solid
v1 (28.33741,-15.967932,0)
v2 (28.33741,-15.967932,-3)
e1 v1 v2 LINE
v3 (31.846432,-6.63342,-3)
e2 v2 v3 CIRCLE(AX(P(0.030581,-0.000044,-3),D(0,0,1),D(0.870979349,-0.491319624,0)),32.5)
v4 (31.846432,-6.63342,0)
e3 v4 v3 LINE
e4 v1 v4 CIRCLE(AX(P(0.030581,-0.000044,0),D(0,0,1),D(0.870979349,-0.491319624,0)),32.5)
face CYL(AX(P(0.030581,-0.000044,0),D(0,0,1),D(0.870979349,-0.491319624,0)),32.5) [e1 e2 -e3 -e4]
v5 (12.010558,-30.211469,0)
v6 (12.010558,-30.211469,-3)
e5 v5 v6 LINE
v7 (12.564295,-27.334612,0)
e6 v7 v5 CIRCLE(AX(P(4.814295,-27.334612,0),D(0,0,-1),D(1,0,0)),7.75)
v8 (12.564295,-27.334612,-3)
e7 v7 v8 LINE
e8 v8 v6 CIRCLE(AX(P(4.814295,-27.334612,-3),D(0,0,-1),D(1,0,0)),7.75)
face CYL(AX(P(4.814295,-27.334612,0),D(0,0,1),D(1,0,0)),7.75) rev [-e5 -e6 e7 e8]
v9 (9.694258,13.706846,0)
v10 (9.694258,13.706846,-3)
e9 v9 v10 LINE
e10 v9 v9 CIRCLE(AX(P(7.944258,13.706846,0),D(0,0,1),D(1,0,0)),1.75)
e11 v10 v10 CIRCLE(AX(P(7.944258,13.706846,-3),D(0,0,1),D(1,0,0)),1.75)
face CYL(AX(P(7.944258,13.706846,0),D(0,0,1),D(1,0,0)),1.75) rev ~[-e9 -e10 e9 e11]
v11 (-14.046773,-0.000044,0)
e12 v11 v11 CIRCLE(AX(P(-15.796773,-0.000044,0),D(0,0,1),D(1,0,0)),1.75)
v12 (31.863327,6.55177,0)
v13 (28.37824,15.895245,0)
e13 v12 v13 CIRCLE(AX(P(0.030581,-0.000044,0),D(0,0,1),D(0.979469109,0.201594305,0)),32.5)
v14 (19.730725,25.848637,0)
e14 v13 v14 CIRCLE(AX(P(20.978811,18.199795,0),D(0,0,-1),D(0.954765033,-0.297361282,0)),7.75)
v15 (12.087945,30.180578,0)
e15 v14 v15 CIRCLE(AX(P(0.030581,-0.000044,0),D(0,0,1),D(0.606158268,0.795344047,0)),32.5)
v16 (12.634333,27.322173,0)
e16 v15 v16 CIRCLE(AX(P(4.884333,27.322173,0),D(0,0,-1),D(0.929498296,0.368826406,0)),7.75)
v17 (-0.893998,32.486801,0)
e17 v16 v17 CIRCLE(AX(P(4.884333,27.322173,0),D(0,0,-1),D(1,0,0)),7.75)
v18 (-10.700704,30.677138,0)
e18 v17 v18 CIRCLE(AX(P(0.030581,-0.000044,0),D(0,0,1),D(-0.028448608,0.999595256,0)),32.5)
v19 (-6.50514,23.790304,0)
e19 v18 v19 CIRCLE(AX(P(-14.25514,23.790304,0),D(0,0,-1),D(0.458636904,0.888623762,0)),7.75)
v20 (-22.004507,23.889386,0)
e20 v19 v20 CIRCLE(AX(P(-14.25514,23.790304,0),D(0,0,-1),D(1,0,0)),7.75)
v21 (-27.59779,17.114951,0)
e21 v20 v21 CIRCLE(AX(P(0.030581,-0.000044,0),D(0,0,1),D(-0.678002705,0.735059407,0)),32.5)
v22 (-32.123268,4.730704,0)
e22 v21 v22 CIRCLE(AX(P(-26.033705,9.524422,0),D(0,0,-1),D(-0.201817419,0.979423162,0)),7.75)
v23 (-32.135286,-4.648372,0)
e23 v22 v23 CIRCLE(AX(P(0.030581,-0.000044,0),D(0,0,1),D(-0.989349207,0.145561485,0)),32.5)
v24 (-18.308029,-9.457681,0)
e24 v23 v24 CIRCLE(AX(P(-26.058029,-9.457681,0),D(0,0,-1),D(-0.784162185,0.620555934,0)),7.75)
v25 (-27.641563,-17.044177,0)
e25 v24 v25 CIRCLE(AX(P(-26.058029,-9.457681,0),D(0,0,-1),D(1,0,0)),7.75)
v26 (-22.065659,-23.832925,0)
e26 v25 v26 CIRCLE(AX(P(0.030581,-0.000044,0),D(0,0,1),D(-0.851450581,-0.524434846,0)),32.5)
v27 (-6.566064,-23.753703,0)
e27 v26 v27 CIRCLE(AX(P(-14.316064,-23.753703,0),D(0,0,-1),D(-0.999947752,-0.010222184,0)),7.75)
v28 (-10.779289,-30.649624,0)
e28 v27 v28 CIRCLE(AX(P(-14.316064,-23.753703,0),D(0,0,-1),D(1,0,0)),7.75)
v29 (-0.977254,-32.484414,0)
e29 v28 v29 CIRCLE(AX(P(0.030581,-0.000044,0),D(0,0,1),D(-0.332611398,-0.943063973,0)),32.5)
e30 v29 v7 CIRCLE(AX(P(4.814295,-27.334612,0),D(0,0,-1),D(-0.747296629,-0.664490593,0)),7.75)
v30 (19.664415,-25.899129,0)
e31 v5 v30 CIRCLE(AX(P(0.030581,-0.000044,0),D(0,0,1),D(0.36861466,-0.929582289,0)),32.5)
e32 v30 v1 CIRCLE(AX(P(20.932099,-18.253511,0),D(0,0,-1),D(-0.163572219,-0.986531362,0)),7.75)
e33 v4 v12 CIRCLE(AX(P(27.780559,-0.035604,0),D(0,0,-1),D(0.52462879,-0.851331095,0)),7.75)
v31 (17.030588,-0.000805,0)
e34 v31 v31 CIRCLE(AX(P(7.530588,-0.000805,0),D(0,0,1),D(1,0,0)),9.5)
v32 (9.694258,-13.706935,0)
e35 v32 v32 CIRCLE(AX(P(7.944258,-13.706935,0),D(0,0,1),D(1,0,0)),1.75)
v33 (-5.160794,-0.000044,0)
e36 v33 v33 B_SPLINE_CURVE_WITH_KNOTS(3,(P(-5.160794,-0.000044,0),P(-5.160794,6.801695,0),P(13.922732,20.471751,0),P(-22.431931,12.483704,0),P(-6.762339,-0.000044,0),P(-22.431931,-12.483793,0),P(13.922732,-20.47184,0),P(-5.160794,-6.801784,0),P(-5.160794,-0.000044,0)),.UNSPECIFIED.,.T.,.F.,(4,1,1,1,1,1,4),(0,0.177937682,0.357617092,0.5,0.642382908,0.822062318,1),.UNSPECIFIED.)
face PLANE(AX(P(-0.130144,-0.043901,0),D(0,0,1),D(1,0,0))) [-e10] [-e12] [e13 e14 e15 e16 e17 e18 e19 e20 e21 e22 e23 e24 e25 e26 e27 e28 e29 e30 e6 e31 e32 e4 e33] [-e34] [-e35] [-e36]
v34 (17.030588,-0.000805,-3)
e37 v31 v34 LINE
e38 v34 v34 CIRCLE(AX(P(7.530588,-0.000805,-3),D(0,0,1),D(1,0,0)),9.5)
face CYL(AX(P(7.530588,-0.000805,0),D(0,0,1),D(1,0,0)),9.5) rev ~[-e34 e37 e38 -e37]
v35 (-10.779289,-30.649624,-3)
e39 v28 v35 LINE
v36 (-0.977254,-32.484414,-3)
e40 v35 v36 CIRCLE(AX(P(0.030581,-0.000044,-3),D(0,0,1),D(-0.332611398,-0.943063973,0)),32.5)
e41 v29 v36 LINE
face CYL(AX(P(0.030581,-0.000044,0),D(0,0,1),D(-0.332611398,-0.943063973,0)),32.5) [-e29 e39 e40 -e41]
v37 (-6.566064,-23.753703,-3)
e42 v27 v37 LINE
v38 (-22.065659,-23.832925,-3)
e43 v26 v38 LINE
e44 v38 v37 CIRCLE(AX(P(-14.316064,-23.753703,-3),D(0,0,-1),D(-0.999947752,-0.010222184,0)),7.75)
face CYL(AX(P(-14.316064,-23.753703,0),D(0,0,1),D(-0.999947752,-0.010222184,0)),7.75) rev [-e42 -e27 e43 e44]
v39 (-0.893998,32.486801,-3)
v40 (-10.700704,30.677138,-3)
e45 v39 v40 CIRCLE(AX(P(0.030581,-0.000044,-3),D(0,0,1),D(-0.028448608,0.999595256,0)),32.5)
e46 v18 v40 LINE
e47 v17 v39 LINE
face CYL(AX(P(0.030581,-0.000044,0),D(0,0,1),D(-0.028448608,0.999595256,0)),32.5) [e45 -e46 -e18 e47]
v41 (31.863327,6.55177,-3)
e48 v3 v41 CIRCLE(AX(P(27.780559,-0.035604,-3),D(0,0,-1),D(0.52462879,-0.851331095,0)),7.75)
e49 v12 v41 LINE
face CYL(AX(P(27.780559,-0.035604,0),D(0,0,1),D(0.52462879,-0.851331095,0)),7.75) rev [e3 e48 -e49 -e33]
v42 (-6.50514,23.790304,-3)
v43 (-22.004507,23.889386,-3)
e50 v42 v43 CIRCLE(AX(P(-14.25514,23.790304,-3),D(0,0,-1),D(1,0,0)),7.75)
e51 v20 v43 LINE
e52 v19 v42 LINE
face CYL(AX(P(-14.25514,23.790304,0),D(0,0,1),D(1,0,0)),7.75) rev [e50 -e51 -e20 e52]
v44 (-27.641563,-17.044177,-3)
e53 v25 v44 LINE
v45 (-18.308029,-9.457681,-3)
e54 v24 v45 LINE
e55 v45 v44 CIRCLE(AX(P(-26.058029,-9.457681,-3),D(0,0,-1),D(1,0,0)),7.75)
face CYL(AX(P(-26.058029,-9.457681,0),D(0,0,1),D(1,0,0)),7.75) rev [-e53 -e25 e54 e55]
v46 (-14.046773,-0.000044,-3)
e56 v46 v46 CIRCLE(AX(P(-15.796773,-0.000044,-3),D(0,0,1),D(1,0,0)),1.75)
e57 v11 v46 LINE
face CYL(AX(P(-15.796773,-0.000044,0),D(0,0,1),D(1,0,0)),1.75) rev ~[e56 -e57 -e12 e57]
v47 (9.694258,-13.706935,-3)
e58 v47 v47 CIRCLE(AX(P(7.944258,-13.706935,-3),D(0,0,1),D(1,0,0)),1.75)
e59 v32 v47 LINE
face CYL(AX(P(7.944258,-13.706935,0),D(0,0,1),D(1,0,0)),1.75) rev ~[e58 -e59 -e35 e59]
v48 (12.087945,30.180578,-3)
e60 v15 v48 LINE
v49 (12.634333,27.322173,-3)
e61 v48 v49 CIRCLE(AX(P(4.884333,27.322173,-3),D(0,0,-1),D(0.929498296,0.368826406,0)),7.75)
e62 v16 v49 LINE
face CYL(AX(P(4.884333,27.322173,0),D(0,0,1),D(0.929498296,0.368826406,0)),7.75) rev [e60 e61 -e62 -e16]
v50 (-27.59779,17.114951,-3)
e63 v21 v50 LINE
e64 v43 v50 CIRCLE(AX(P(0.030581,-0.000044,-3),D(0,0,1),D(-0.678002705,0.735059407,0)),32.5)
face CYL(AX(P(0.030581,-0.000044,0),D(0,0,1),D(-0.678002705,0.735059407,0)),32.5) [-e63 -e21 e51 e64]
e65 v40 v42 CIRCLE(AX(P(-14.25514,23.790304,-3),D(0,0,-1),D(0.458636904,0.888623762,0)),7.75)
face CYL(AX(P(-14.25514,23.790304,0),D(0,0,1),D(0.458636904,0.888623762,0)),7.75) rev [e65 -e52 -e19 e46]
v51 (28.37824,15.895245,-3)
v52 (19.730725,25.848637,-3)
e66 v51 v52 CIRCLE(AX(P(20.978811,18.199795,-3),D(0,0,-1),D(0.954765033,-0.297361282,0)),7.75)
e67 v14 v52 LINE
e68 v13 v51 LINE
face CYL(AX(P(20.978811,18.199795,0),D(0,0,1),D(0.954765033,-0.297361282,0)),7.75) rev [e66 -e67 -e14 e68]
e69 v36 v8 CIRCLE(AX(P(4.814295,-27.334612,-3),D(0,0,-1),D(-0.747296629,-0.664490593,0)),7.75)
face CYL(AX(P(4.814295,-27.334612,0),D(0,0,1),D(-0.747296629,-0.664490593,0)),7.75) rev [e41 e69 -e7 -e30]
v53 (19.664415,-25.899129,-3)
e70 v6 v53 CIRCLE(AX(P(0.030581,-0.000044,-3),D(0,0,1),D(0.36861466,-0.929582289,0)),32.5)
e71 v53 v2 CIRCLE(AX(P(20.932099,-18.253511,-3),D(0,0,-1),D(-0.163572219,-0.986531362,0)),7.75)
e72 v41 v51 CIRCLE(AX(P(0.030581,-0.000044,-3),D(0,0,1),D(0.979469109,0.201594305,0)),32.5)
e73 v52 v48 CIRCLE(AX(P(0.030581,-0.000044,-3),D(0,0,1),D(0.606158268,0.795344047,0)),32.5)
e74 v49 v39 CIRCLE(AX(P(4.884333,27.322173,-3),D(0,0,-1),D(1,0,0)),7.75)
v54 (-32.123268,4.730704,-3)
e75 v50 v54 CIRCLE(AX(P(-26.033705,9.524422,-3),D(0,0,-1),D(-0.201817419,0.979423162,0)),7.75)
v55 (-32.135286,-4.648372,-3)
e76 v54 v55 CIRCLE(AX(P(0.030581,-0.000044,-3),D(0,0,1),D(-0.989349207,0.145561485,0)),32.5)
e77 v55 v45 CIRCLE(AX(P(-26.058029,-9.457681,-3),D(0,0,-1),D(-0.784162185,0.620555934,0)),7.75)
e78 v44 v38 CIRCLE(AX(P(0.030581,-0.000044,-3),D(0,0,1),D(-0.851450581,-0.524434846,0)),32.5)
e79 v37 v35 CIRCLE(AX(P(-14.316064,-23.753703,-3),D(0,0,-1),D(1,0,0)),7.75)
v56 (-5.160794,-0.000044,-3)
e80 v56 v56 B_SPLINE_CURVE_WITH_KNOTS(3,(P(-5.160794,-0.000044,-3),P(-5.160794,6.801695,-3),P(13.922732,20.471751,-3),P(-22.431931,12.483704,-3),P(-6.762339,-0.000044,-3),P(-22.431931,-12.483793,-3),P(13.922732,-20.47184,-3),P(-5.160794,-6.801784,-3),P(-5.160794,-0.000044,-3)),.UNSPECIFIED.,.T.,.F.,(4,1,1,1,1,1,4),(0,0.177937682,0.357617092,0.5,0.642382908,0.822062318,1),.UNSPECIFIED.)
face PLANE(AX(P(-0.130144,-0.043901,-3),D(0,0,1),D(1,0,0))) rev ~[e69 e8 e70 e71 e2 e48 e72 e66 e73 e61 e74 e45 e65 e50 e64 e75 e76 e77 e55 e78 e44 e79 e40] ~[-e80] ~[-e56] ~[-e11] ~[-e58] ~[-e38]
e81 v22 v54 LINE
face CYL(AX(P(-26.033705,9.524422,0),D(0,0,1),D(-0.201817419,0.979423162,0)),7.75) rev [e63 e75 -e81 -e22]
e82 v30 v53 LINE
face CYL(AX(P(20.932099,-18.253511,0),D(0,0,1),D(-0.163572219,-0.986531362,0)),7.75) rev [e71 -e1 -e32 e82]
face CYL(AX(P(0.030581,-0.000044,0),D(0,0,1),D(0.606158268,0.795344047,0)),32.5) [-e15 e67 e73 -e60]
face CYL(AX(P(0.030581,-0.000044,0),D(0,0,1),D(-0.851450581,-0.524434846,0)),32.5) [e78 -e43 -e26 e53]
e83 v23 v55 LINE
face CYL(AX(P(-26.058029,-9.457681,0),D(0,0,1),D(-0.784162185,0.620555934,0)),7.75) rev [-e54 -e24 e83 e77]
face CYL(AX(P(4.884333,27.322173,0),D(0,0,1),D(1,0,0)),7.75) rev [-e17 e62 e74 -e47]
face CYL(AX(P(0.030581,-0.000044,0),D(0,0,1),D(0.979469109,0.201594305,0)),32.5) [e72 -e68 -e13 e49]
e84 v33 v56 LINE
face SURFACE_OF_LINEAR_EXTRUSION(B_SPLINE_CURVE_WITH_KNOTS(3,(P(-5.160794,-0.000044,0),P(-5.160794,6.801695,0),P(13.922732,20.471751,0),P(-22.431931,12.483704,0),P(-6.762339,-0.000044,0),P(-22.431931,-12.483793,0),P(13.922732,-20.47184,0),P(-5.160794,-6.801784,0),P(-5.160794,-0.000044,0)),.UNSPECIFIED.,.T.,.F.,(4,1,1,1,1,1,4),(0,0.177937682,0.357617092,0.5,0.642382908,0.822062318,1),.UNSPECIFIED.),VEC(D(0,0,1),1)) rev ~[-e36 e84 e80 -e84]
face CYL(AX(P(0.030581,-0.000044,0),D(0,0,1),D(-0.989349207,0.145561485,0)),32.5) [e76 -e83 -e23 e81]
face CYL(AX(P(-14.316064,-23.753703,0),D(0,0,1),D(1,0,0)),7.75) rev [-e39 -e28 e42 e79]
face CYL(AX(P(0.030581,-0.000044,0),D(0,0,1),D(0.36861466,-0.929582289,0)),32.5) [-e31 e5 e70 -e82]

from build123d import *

# Parameters (mm, degrees)
F0_R     = 1.75
F0_R_2   = 9.5
F1_DEPTH = 3


with BuildPart() as f1:
    # F0 (on Top) → F1 (new body)
    with BuildSketch(Plane.XY):
        with BuildLine():
            ThreePointArc((31.8464317163, -6.633419719), (20.0305649598, -0.0256727641), (31.8633274362, 6.5517704478))
            ThreePointArc((31.8633274362, 6.5517704478), (30.4812860438, 11.3579740989), (28.3782402338, 15.8952453347))
            ThreePointArc((28.3782402338, 15.8952453347), (15.1284046954, 13.1169571507), (19.7307251041, 25.8486370824))
            ThreePointArc((19.7307251041, 25.8486370824), (16.0563808794, 28.274038207), (12.0879452, 30.1805780979))
            ThreePointArc((12.0879452, 30.1805780979), (12.4965108678, 28.7772522453), (12.6343334068, 27.3221734497))
            ThreePointArc((12.6343334068, 27.3221734497), (2.1202396518, 20.0818498579), (-0.8939983903, 32.4868013785))
            ThreePointArc((-0.8939983903, 32.4868013785), (-5.8671739777, 31.9603448058), (-10.7007039407, 30.6771378688))
            ThreePointArc((-10.7007039407, 30.6771378688), (-7.6366288229, 27.822401242), (-6.5051399496, 23.7903037152))
            ThreePointArc((-6.5051399496, 23.7903037152), (-14.304682236, 16.0404620677), (-22.0045065462, 23.8893862634))
            ThreePointArc((-22.0045065462, 23.8893862634), (-25.0311035566, 20.692030069), (-27.5977904465, 17.1149510223))
            ThreePointArc((-27.5977904465, 17.1149510223), (-21.1377458251, 15.5320899009), (-18.2837054482, 9.5244215205))
            ThreePointArc((-18.2837054482, 9.5244215205), (-23.4971338146, 2.2012866489), (-32.1232678605, 4.7307037955))
            ThreePointArc((-32.1232678605, 4.7307037955), (-32.469391937, 0.0416015456), (-32.1352863632, -4.6483723617))
            ThreePointArc((-32.1352863632, -4.6483723617), (-23.5120758979, -2.1378023923), (-18.3080294269, -9.4576808495))
            ThreePointArc((-18.3080294269, -9.4576808495), (-21.1697721423, -15.4716180556), (-27.6415625158, -17.0441769417))
            ThreePointArc((-27.6415625158, -17.0441769417), (-25.084051496, -20.62782222), (-22.0656587015, -23.8329245639))
            ThreePointArc((-22.0656587015, -23.8329245639), (-14.3556751017, -16.0038038715), (-6.5660636226, -23.7537026405))
            ThreePointArc((-6.5660636226, -23.7537026405), (-7.7027247217, -27.7942779191), (-10.7792890631, -30.6496235881))
            ThreePointArc((-10.7792890631, -30.6496235881), (-5.9490636133, -31.9452138205), (-0.9772535761, -32.4844140616))
            ThreePointArc((-0.9772535761, -32.4844140616), (2.0594816782, -20.0907523688), (12.5642953015, -27.3346119685))
            ThreePointArc((12.5642953015, -27.3346119685), (12.4246019524, -28.7994439311), (12.0105578361, -30.2114688529))
            ThreePointArc((12.0105578361, -30.2114688529), (15.9838666182, -28.3151056442), (19.6644146639, -25.8991291997))
            ThreePointArc((19.6644146639, -25.8991291997), (15.0947384847, -13.1556961205), (28.3374102331, -15.9679322398))
            ThreePointArc((28.3374102331, -15.9679322398), (30.4520773857, -11.4360656509), (31.8464317163, -6.633419719))
        make_face()
        with Locations((7.944258402, -13.7069351322)):
            Circle(F0_R, mode=Mode.SUBTRACT)
        with Locations((-15.7967726636, -4.44556e-05)):
            Circle(F0_R, mode=Mode.SUBTRACT)
        with BuildLine():
            add(Edge.make_bspline(
                [(-5.1607941213, -4.44556e-05), (-5.1607941213, 6.8016946043), (13.9227316309, 20.4717509816), (-22.4319309953, 12.4837041278), (-6.7623394337, -4.44556e-05), (-22.4319309953, -12.483793039), (13.9227316309, -20.4718398928), (-5.1607941213, -6.8017835155), (-5.1607941213, -4.44556e-05)],
                knots=[0, 0, 0, 0, 0.177937682, 0.3576170923, 0.5, 0.6423829077, 0.822062318, 1, 1, 1, 1], degree=3))
        make_face(mode=Mode.SUBTRACT)
        with Locations((7.5305884979, -0.0008045419)):
            Circle(F0_R_2, mode=Mode.SUBTRACT)
        with Locations((7.944258402, 13.7068462209)):
            Circle(F0_R, mode=Mode.SUBTRACT)
    extrude(amount=-F1_DEPTH)


solid = f1.part
